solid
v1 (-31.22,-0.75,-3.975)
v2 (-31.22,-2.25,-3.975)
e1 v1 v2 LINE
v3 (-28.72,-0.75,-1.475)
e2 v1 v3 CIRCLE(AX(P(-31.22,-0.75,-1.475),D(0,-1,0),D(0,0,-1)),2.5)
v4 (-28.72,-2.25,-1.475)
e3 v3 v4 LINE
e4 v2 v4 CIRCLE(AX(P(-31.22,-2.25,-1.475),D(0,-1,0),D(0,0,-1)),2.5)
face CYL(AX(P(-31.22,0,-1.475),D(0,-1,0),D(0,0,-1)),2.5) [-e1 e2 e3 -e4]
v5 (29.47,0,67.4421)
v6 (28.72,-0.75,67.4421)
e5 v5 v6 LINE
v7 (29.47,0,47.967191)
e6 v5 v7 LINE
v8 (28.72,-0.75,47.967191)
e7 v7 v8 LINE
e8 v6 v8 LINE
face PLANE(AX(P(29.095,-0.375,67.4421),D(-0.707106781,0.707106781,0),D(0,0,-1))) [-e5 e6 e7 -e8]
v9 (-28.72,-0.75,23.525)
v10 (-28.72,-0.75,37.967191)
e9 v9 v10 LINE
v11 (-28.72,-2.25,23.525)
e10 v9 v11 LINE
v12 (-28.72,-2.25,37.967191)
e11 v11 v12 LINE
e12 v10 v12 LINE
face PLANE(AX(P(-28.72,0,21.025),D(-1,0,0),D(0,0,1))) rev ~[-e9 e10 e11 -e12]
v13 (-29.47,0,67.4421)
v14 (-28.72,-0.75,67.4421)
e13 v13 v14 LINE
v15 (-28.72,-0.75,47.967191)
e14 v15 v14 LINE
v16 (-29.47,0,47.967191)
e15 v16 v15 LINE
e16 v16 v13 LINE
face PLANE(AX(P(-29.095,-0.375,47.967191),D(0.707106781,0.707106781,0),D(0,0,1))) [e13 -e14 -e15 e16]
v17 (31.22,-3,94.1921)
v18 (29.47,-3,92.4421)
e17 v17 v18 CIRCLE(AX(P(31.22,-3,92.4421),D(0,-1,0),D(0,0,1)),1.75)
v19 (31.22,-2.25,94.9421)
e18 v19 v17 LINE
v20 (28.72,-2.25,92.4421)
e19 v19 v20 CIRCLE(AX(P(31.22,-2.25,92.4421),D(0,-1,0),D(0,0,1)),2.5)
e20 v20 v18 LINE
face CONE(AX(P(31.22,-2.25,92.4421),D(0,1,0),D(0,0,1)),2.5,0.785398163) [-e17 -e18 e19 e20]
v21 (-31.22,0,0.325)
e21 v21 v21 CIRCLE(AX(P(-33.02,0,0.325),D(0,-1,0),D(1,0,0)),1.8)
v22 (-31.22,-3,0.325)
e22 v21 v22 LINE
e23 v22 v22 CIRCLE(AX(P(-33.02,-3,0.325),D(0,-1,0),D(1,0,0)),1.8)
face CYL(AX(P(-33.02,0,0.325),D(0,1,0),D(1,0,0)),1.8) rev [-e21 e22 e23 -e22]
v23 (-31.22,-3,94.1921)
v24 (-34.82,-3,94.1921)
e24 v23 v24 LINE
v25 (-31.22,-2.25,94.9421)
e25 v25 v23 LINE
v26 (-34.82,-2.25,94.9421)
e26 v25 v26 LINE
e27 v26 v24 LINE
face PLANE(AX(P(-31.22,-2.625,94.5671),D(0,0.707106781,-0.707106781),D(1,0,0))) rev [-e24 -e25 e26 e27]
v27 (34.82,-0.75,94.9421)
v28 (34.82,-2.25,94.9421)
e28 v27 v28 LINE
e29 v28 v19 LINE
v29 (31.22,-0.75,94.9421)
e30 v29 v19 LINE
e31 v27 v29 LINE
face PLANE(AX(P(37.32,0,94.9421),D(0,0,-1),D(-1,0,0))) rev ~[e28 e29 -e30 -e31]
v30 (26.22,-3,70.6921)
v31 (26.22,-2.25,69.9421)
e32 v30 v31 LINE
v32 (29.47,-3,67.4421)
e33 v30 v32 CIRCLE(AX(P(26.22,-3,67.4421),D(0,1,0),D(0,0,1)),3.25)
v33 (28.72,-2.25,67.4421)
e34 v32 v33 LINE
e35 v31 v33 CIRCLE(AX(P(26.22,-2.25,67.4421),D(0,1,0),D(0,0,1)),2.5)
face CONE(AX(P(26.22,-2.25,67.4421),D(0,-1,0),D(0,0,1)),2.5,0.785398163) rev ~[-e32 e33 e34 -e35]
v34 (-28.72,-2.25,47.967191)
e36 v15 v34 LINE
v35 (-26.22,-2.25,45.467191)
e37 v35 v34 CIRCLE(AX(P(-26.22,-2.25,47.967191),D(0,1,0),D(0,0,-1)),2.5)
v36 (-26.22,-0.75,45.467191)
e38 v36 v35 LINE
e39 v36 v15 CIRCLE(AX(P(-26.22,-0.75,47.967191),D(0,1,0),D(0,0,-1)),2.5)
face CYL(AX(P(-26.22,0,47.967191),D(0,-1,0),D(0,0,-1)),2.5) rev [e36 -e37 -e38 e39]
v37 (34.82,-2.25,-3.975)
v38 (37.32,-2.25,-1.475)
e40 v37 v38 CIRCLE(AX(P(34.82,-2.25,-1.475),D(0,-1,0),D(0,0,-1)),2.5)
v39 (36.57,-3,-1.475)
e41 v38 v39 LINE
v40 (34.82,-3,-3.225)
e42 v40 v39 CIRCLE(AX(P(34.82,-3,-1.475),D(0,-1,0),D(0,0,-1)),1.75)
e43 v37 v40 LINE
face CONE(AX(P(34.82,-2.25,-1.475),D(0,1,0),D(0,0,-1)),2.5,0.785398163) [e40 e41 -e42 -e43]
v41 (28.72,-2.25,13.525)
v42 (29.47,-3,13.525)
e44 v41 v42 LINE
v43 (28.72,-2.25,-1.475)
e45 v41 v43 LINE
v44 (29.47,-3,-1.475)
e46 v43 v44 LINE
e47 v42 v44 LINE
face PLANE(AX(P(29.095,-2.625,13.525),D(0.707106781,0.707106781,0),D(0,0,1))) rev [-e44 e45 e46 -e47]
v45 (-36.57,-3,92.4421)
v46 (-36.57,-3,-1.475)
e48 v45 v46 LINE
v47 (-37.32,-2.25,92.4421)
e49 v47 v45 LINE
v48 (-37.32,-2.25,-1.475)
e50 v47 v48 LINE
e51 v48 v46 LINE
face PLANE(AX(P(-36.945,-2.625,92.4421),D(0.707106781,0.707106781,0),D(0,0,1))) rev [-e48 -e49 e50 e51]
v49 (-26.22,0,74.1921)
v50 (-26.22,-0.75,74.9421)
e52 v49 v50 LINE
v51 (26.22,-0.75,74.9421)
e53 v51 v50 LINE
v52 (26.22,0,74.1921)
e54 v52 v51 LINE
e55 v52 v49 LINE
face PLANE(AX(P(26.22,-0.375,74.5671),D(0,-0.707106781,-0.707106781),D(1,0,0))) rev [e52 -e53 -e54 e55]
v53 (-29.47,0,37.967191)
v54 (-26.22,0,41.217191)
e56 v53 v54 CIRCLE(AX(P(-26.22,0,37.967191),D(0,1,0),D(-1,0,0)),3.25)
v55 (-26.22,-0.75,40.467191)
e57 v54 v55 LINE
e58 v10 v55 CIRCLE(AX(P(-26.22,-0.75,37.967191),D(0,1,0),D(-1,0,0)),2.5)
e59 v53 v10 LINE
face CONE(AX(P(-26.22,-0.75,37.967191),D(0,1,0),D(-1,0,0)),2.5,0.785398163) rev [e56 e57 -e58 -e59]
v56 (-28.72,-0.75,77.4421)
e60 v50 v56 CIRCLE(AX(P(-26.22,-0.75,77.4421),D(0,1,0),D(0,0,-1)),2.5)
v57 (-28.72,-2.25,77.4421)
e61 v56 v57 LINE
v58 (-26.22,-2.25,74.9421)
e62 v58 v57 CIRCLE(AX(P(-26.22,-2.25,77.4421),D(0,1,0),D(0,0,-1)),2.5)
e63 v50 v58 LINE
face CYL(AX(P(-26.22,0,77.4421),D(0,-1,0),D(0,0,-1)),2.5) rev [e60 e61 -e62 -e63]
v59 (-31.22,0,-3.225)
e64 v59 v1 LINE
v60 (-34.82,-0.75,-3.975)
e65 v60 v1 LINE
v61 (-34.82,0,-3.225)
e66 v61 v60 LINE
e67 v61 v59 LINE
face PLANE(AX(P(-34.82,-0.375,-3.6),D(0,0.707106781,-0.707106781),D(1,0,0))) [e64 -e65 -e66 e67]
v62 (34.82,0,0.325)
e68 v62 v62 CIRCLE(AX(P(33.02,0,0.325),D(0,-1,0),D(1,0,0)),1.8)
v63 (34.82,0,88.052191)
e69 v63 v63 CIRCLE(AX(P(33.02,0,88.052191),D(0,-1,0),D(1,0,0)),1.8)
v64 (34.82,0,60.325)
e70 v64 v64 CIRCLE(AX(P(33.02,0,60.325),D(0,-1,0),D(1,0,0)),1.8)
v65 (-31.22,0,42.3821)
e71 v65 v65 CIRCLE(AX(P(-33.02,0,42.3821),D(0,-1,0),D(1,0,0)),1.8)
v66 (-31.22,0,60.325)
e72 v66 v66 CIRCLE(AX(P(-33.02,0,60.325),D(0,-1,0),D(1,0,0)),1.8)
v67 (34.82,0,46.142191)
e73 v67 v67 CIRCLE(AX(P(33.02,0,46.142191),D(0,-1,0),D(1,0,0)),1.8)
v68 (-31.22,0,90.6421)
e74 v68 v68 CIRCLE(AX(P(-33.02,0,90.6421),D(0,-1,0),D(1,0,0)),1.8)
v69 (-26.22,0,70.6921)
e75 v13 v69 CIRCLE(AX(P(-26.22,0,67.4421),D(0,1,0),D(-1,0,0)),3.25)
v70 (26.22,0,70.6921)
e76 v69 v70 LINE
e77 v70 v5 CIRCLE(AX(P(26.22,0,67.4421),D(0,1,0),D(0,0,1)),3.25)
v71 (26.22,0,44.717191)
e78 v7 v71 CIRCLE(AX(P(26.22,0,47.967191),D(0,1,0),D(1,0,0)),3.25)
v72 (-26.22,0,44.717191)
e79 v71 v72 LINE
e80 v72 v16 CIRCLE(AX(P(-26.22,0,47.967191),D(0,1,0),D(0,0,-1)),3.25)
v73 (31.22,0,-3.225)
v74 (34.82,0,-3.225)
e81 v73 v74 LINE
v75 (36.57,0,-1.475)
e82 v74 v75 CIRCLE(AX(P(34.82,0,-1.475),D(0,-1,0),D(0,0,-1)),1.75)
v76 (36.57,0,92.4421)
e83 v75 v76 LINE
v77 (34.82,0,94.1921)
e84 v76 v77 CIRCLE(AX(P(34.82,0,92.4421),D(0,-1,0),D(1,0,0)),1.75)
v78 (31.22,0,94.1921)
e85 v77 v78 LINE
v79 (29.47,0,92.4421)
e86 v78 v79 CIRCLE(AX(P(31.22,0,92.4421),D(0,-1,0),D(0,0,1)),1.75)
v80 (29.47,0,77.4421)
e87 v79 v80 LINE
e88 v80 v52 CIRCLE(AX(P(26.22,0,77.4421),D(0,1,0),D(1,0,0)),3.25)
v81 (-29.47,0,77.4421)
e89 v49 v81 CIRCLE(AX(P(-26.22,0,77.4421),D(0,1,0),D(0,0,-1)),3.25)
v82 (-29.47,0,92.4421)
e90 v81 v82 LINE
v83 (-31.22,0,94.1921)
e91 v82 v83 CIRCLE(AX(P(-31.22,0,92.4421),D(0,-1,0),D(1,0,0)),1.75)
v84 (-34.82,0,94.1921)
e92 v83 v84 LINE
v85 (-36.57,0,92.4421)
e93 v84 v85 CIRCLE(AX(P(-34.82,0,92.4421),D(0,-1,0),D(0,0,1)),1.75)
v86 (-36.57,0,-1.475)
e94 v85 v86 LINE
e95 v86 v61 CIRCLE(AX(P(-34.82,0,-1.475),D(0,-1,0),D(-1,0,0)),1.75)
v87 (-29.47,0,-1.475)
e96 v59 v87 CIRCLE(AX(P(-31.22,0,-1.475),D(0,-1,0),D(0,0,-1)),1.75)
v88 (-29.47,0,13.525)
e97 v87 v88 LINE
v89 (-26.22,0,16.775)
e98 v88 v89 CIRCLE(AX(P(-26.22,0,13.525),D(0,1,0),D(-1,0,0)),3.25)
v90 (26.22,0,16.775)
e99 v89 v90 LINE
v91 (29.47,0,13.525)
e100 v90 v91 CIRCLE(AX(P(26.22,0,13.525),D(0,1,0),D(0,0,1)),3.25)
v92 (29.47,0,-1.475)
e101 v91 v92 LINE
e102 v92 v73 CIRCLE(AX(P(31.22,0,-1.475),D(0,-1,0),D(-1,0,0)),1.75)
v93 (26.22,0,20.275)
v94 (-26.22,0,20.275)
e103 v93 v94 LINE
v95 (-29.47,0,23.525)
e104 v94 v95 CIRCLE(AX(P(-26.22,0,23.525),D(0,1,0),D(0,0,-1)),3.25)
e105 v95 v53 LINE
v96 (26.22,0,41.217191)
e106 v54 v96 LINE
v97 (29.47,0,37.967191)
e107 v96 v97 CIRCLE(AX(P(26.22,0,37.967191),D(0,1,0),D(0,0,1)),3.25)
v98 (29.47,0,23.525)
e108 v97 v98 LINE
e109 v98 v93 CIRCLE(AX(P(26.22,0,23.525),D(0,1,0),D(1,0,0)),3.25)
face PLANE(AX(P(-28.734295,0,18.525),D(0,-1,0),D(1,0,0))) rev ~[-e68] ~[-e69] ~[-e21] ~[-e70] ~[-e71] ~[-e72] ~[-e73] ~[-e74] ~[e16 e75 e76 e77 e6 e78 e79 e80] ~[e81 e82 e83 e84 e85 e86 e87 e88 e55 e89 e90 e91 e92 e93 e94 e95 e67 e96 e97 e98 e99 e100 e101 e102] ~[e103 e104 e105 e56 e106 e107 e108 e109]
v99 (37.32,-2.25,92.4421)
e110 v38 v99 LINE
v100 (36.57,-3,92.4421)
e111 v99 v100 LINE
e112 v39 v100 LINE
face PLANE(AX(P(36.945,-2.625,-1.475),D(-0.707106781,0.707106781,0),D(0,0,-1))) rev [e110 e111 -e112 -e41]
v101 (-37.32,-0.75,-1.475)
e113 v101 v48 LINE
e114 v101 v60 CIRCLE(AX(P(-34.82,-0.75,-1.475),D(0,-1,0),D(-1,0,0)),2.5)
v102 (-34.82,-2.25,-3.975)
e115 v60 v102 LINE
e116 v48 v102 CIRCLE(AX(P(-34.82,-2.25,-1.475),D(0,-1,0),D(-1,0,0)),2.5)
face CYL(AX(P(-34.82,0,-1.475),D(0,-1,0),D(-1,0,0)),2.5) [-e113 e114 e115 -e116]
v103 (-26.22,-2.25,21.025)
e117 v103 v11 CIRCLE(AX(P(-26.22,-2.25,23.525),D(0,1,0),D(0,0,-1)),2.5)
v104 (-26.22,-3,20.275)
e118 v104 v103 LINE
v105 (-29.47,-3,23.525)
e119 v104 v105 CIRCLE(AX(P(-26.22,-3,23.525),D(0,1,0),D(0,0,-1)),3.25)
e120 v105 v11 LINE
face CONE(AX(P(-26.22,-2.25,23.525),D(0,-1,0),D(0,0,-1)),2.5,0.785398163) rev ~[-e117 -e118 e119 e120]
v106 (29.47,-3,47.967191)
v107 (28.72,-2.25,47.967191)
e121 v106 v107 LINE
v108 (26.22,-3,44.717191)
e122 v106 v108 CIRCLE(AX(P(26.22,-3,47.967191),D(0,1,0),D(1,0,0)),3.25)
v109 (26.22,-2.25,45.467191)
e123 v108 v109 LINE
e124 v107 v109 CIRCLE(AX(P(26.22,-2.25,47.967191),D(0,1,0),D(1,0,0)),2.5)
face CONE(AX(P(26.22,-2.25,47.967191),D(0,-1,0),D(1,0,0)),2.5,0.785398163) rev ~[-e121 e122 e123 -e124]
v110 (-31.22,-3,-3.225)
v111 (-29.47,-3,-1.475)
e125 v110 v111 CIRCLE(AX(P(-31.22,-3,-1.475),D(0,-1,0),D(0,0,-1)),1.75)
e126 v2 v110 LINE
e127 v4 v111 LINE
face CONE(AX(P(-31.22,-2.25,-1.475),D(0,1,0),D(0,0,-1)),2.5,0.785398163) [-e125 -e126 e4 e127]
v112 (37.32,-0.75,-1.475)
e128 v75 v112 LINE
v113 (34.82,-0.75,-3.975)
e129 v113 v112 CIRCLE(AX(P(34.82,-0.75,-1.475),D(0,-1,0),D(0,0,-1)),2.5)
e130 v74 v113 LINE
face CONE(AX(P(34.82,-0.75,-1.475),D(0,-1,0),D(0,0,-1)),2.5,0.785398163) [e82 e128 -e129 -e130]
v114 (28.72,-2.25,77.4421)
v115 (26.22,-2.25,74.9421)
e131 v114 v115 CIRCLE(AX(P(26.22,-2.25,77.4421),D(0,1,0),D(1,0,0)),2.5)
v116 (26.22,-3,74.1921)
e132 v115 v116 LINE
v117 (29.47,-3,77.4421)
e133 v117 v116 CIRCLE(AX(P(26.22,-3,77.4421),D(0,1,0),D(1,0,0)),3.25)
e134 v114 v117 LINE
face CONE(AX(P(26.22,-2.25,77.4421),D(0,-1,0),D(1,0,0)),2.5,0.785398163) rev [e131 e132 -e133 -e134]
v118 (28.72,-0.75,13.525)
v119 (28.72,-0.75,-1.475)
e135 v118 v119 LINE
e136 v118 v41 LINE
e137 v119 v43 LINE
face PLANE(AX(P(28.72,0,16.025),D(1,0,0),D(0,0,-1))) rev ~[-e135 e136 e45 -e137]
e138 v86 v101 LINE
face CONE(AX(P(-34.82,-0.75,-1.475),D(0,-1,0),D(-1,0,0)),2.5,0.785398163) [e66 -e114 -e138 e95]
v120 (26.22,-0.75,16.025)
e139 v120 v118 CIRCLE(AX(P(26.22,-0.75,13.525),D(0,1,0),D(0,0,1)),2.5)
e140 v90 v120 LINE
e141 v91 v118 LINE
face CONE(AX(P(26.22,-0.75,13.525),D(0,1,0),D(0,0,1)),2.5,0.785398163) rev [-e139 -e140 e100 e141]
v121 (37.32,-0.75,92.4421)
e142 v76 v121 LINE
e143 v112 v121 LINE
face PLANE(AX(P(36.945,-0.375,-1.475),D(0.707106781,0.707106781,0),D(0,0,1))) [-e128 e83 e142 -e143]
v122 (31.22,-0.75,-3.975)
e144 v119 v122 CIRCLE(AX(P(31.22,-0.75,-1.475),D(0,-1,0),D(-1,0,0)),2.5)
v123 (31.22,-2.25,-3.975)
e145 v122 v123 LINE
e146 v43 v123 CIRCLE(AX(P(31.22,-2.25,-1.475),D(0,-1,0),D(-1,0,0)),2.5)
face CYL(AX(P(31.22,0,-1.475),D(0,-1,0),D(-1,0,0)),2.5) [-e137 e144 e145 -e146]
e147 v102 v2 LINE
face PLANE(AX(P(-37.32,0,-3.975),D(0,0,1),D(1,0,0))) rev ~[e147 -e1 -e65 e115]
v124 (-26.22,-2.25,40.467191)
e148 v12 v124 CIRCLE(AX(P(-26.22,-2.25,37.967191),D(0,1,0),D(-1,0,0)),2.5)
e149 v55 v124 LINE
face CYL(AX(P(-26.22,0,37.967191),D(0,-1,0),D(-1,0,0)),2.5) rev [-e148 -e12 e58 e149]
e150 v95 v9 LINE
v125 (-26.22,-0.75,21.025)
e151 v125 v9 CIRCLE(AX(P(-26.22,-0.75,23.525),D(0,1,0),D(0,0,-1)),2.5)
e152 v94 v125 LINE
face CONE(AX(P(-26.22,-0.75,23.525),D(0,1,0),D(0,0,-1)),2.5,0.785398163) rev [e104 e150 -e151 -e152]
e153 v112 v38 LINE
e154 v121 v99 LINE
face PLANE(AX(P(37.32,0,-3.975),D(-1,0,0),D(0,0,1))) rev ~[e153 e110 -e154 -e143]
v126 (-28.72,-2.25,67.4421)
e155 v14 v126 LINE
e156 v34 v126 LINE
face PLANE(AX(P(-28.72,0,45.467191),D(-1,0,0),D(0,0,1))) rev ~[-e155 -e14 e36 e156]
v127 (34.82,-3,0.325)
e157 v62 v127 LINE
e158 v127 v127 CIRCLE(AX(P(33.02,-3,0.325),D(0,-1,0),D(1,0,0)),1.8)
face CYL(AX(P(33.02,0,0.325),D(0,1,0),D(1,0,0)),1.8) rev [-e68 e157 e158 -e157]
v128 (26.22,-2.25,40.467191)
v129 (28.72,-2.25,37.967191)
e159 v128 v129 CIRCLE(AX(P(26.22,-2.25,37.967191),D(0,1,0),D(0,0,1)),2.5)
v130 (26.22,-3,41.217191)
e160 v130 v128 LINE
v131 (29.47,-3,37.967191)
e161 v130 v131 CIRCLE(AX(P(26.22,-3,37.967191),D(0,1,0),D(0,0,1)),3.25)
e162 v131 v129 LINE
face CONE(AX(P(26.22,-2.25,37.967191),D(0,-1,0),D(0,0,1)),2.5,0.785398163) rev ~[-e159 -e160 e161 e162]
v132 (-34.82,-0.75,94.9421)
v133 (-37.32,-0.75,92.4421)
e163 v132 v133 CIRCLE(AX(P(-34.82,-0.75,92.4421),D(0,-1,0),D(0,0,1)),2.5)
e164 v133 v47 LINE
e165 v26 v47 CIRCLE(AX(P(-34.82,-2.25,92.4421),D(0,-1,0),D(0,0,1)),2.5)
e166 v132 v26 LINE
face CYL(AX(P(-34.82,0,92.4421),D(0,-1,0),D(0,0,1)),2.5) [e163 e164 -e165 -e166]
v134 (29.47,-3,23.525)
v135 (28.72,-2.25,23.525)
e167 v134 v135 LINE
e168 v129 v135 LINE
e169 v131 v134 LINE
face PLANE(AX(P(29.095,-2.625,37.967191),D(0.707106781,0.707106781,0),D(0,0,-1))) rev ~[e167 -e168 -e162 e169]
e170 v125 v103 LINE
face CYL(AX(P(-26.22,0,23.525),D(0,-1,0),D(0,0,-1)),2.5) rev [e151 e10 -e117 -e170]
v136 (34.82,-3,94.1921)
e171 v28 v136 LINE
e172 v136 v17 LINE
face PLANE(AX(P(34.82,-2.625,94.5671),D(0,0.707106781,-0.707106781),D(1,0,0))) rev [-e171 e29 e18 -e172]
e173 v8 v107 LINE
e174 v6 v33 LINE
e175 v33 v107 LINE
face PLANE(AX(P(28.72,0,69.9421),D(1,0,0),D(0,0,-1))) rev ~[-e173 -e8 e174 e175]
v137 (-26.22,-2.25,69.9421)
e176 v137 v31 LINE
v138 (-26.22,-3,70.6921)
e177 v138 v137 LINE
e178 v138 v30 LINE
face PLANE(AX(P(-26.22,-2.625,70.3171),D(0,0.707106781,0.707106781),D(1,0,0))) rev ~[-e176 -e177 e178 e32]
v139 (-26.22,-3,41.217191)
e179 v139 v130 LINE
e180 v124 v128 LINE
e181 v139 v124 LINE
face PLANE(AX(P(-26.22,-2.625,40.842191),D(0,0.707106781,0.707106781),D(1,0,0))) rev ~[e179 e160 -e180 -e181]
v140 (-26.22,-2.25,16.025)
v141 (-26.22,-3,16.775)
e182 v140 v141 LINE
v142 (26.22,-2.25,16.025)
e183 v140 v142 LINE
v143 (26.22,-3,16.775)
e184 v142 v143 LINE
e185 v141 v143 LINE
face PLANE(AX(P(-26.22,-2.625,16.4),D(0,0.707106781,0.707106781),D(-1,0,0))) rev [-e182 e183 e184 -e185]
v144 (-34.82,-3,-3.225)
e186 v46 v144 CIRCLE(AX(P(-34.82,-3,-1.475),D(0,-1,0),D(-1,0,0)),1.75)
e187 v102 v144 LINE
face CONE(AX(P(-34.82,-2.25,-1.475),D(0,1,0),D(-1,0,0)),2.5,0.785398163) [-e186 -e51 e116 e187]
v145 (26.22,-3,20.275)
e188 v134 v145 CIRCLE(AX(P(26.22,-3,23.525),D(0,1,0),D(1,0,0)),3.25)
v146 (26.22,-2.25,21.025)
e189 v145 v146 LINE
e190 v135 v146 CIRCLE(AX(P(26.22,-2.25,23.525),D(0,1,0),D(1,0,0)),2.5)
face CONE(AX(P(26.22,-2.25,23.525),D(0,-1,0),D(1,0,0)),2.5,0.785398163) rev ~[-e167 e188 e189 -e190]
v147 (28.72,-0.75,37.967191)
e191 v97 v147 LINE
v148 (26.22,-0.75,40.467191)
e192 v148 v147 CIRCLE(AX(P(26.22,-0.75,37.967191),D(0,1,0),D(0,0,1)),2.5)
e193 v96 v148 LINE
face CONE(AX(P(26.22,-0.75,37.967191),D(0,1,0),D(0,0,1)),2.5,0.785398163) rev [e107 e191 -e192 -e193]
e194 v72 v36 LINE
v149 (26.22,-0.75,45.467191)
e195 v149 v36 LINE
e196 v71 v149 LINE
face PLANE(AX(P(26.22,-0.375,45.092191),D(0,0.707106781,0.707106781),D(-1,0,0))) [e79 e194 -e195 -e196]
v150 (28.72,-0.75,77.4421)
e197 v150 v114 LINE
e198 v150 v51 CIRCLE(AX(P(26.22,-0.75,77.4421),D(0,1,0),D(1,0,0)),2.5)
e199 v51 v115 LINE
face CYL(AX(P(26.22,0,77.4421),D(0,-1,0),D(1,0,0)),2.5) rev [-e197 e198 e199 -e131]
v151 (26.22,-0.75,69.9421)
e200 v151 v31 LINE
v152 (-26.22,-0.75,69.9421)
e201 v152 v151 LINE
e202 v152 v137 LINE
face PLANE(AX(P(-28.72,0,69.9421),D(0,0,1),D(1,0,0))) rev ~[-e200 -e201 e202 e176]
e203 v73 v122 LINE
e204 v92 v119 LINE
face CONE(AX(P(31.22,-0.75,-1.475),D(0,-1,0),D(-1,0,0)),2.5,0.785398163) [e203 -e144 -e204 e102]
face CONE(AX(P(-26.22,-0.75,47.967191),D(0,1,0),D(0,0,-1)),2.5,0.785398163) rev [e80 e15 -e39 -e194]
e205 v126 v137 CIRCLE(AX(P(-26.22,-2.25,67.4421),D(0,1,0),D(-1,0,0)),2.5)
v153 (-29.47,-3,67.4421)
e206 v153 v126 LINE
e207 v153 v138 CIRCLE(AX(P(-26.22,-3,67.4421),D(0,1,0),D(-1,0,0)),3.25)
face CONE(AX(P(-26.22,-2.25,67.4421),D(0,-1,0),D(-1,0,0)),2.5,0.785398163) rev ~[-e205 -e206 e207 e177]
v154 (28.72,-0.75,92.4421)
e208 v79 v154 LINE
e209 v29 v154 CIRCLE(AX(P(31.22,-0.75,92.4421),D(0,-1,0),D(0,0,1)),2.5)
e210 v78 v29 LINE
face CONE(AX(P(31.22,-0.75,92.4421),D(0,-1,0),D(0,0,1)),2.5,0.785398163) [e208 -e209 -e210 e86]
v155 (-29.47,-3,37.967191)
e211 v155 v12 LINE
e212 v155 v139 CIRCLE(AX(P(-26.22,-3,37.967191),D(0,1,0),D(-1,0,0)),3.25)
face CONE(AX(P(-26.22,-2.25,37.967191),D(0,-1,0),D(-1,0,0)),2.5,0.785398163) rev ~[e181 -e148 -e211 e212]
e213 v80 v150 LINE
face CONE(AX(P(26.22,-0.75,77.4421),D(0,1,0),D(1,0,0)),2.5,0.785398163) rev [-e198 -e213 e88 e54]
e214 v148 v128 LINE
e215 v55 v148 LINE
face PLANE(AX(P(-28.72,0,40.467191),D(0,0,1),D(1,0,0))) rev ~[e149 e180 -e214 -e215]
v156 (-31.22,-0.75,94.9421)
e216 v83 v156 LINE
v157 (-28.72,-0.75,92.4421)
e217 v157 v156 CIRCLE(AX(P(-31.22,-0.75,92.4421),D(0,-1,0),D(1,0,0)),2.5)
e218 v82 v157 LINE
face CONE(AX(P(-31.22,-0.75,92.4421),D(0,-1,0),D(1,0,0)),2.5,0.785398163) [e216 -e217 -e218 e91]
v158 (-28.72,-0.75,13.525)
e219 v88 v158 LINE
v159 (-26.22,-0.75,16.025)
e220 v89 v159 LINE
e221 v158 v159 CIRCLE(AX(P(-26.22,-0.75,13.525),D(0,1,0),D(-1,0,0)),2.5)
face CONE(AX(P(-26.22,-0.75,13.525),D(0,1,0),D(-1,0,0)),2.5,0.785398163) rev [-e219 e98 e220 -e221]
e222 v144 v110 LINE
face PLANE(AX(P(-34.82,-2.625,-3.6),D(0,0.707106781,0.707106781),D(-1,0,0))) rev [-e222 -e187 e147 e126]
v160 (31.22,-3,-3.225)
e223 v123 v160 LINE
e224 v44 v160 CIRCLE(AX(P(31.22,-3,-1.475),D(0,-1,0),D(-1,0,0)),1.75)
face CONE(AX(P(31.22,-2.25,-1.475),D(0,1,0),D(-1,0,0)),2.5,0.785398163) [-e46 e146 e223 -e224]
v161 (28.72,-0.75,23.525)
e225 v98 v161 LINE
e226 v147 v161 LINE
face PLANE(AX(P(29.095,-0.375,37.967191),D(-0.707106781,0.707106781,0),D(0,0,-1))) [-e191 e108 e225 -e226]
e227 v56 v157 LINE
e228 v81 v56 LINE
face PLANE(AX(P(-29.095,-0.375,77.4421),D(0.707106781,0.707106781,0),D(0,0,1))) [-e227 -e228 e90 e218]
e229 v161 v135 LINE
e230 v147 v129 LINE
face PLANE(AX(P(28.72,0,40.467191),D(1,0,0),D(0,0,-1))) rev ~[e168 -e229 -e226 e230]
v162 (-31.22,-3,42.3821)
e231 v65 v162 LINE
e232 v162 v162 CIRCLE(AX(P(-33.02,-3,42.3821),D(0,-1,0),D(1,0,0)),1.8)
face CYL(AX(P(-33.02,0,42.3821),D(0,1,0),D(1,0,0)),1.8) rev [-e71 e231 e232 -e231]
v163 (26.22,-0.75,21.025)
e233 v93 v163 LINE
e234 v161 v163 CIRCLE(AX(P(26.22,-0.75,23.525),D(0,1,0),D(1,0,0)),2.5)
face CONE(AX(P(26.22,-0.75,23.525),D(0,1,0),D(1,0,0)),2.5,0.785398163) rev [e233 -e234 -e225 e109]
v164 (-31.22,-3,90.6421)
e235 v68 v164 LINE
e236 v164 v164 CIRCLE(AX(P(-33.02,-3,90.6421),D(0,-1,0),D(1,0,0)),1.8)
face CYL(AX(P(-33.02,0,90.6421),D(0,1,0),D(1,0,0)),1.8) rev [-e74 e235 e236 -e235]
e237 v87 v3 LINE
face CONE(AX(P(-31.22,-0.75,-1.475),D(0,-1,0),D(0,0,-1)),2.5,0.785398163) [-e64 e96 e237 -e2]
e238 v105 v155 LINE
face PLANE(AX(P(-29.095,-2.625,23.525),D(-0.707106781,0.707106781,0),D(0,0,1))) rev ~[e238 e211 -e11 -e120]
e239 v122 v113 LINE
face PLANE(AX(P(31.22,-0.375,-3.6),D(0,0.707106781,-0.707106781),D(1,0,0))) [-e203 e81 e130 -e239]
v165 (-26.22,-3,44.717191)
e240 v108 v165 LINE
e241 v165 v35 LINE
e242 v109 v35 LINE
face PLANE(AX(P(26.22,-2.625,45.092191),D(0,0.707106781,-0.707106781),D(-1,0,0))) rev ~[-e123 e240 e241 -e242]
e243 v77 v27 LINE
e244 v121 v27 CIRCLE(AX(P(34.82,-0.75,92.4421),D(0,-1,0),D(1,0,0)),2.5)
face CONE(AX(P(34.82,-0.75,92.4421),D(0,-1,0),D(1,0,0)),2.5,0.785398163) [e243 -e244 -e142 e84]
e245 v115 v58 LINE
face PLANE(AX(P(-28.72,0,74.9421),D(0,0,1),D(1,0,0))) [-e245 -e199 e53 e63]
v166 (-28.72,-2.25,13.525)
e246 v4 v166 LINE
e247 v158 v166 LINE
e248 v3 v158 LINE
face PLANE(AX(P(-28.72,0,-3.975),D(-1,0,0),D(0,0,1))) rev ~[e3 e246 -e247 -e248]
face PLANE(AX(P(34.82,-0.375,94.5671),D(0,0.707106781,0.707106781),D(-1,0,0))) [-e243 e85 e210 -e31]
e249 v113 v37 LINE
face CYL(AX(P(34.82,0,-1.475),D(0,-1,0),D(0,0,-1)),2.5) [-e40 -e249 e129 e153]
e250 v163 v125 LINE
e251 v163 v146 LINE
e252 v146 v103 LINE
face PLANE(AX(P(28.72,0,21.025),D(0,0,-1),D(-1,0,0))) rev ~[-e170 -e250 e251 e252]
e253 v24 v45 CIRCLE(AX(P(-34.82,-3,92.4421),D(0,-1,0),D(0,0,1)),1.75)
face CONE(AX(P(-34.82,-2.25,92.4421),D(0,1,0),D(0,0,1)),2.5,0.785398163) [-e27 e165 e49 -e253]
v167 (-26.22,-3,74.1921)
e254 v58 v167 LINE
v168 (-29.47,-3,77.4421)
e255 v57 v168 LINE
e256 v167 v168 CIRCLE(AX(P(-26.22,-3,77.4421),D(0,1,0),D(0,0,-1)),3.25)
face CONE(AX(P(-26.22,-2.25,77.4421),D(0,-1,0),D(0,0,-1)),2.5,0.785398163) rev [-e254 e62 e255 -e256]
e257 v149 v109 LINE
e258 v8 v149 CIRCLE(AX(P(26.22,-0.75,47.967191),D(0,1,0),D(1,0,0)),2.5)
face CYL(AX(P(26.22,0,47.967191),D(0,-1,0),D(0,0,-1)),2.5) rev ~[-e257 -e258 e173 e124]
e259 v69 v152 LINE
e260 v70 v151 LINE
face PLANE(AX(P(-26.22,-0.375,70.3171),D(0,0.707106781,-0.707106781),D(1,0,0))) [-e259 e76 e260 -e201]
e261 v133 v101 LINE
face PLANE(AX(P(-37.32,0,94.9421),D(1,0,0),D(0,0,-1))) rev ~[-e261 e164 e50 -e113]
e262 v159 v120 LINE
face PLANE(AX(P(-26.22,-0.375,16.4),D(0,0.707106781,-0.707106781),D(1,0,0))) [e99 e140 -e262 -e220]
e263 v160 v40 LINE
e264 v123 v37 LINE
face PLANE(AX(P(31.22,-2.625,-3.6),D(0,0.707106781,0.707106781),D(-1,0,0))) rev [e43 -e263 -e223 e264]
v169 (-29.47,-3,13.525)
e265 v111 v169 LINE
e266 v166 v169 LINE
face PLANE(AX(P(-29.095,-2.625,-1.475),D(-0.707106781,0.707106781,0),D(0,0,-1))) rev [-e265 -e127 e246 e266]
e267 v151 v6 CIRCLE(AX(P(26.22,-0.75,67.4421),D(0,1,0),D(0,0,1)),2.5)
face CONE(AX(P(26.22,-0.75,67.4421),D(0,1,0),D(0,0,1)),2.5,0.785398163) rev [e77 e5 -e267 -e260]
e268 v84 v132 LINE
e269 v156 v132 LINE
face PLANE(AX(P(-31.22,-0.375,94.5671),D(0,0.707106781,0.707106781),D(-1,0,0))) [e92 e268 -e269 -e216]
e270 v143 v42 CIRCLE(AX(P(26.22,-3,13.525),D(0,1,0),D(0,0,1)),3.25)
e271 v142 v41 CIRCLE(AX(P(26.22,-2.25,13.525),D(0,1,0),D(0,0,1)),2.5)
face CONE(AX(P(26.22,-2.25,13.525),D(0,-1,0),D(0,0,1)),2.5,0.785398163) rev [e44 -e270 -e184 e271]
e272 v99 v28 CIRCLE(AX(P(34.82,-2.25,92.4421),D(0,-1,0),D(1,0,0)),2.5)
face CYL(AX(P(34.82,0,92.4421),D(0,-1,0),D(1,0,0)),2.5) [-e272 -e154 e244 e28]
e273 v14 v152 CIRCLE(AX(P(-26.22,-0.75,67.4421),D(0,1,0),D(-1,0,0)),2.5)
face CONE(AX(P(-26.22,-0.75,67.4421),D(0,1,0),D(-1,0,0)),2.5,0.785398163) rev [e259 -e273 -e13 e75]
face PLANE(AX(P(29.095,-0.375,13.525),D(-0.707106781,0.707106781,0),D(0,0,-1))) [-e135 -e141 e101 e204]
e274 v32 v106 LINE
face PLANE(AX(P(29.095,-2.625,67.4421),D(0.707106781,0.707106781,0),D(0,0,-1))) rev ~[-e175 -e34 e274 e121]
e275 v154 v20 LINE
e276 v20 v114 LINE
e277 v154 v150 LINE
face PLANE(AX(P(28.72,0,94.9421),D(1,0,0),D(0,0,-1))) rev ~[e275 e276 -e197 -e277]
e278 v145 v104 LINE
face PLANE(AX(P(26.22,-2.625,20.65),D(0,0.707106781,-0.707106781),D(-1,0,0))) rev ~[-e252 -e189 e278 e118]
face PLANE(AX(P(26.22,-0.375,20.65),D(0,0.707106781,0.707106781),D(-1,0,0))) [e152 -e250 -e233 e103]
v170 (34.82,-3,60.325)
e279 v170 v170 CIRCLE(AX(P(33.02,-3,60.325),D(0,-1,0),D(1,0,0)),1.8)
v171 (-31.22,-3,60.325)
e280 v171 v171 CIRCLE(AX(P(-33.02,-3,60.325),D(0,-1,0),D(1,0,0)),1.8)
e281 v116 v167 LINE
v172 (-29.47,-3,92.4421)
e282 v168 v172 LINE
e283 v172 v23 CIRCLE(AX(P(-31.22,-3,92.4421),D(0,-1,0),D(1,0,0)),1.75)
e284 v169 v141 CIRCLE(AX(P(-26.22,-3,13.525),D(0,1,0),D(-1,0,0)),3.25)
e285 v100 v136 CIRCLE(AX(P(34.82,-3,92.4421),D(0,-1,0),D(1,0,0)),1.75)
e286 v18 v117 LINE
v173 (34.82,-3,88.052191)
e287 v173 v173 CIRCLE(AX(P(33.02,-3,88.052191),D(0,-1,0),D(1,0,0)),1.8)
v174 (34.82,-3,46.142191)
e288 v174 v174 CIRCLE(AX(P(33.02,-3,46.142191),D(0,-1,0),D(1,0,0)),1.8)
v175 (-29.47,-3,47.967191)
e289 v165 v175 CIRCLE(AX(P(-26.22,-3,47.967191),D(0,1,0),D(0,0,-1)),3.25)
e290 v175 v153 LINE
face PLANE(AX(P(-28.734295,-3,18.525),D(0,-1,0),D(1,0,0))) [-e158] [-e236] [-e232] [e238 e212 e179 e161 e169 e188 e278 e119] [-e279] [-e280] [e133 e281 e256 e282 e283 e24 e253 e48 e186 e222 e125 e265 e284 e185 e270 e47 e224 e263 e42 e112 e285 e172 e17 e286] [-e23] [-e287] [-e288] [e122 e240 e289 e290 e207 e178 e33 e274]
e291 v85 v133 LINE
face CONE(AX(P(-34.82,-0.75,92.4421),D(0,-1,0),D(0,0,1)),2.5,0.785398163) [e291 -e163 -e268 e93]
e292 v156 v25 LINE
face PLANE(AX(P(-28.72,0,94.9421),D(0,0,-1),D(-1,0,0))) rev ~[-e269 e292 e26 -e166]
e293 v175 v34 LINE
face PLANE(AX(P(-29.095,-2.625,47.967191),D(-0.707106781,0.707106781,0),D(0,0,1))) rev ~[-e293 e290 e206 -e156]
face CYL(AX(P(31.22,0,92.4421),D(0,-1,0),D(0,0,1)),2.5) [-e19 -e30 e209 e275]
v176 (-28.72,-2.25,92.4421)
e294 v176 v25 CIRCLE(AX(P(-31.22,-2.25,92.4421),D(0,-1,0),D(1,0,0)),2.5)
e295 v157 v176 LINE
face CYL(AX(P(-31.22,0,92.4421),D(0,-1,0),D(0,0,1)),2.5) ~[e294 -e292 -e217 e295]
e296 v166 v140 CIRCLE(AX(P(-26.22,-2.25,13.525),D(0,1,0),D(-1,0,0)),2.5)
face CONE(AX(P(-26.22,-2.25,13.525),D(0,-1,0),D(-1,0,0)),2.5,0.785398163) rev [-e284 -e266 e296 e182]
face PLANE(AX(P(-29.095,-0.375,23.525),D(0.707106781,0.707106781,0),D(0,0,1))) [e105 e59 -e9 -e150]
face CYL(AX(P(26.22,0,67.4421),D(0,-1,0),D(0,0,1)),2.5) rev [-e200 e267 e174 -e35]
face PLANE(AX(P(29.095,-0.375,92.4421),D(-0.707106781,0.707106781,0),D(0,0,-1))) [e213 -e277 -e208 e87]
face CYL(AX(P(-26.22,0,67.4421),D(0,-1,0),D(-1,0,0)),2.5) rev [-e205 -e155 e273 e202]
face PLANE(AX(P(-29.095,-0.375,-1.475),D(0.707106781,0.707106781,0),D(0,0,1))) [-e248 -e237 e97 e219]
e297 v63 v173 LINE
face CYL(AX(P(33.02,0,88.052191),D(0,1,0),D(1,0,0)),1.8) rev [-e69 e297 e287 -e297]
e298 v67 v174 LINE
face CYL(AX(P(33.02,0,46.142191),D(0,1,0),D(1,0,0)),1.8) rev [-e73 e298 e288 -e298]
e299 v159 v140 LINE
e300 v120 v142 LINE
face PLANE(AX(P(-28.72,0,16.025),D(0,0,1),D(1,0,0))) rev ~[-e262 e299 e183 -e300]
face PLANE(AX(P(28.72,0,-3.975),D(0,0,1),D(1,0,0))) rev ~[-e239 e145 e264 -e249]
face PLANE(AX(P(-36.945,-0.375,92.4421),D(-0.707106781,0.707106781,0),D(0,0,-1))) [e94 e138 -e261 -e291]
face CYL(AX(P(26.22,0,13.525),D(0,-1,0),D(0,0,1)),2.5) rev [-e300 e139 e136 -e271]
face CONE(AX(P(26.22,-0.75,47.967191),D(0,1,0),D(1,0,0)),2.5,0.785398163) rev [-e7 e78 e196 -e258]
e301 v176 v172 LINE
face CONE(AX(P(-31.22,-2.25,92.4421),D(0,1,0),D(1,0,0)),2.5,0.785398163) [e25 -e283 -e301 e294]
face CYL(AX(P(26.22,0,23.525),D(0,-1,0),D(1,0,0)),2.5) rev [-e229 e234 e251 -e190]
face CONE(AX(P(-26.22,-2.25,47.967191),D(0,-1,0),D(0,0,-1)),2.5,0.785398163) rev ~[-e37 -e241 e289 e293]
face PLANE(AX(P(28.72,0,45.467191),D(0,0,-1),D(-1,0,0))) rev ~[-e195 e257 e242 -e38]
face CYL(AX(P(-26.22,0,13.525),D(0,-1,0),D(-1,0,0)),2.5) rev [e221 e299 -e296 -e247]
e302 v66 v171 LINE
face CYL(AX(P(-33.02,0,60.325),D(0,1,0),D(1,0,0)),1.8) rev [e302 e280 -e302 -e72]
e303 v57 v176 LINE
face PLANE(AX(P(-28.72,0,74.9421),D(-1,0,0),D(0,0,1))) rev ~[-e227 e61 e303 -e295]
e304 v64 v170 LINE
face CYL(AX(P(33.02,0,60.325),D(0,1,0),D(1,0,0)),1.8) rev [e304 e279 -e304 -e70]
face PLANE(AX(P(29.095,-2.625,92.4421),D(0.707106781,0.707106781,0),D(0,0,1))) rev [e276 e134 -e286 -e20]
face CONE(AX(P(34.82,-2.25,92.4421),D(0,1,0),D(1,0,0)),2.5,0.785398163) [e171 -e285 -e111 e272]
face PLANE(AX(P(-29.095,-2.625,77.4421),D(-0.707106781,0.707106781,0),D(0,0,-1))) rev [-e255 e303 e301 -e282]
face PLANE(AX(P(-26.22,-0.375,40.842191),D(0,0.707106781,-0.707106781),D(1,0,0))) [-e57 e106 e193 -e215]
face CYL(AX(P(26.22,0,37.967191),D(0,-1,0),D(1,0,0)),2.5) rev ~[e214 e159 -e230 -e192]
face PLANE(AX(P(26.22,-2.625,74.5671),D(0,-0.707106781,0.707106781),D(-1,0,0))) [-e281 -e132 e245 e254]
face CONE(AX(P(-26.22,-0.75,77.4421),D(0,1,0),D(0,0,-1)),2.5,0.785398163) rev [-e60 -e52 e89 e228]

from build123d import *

# Parameters (mm, degrees)
F0_W     = 0.0285906434
F0_H     = 5
F0_W_2   = 28.72
F0_R     = 1.8
F0_W_3   = 57.44
F1_DEPTH = 3
F2_R     = 2.5
F3_SIZE  = 0.75


# Not quite as in the source:
# - a feature names something its author has since deleted; it is built from what else it names


with BuildPart() as f1:
    # F0 (on Front) → F1 (new body)
    with BuildSketch(Plane.XZ):
        with Locations((-28.7342953217, 18.525)):
            Rectangle(F0_W, F0_H)
        with Locations((28.7342953217, 18.525)):
            Rectangle(F0_W, F0_H)
        with Locations((-14.36, 18.525)):
            Rectangle(F0_W_2, F0_H)
        with Locations((14.36, 18.525)):
            Rectangle(F0_W_2, F0_H)
        with Locations((14.36, 42.9671912789)):
            Rectangle(F0_W_2, F0_H)
        Polygon((28.72, 94.9421003461), (28.72, 74.9421003461), (28.72, 69.9421003461), (28.72, 45.4671912789), (28.72, 40.4671912789), (28.72, 21.025), (28.7485906434, 21.025), (28.7485906434, 16.025), (28.72, 16.025), (28.72, -3.975), (37.32, -3.975), (37.32, 94.9421003461), align=None)
        with Locations((33.02, 0.325)):
            Circle(F0_R, mode=Mode.SUBTRACT)
        with Locations((33.02, 46.1421912789)):
            Circle(F0_R, mode=Mode.SUBTRACT)
        with Locations((33.02, 60.325)):
            Circle(F0_R, mode=Mode.SUBTRACT)
        with Locations((33.02, 88.0521912789)):
            Circle(F0_R, mode=Mode.SUBTRACT)
        with Locations((-14.36, 42.9671912789)):
            Rectangle(F0_W_2, F0_H)
        Polygon((-28.72, 94.9421003461), (-37.32, 94.9421003461), (-37.32, -3.975), (-28.72, -3.975), (-28.72, 16.025), (-28.7485906434, 16.025), (-28.7485906434, 21.025), (-28.72, 21.025), (-28.72, 40.4671912789), (-28.72, 45.4671912789), (-28.72, 69.9421003461), (-28.72, 74.9421003461), align=None)
        with Locations((-33.02, 0.325)):
            Circle(F0_R, mode=Mode.SUBTRACT)
        with Locations((-33.02, 42.3821003461)):
            Circle(F0_R, mode=Mode.SUBTRACT)
        with Locations((-33.02, 60.325)):
            Circle(F0_R, mode=Mode.SUBTRACT)
        with Locations((-33.02, 90.6421003461)):
            Circle(F0_R, mode=Mode.SUBTRACT)
        with Locations((0, 72.4421003461)):
            Rectangle(F0_W_3, F0_H)
    extrude(amount=F1_DEPTH)

    # F2
    f2_edges = [f1.edges().sort_by_distance(p)[0] for p in [
        (-28.72, -1.5, 45.467191),
        (28.72, -1.5, 45.467191),
        (-28.72, -1.5, 40.467191),
        (28.72, -1.5, 40.467191),
        (-28.72, -1.5, 21.025),
        (28.72, -1.5, 21.025),
        (-28.72, -1.5, 16.025),
        (28.72, -1.5, 16.025),
        (28.72, -1.5, -3.975),
        (37.32, -1.5, -3.975),
        (-37.32, -1.5, -3.975),
        (-28.72, -1.5, -3.975),
        (37.32, -1.5, 94.9421),
        (28.72, -1.5, 94.9421),
        (-37.32, -1.5, 94.9421),
        (-28.72, -1.5, 94.9421),
        (-28.72, -1.5, 69.9421),
        (28.72, -1.5, 69.9421),
        (-28.72, -1.5, 74.9421),
        (28.72, -1.5, 74.9421),
    ]]
    fillet(f2_edges, radius=F2_R)

    # F3
    f3_edges = [f1.edges().sort_by_distance(p)[0] for p in [
        (0, 0, 16.025),
        (0, 0, 40.467191),
        (-33.02, -3, 94.9421),
        (0, -3, 40.467191),
        (0, -3, 69.9421),
        (0, 0, 69.9421),
    ]]
    chamfer(f3_edges, length=F3_SIZE)


solid = f1.part
